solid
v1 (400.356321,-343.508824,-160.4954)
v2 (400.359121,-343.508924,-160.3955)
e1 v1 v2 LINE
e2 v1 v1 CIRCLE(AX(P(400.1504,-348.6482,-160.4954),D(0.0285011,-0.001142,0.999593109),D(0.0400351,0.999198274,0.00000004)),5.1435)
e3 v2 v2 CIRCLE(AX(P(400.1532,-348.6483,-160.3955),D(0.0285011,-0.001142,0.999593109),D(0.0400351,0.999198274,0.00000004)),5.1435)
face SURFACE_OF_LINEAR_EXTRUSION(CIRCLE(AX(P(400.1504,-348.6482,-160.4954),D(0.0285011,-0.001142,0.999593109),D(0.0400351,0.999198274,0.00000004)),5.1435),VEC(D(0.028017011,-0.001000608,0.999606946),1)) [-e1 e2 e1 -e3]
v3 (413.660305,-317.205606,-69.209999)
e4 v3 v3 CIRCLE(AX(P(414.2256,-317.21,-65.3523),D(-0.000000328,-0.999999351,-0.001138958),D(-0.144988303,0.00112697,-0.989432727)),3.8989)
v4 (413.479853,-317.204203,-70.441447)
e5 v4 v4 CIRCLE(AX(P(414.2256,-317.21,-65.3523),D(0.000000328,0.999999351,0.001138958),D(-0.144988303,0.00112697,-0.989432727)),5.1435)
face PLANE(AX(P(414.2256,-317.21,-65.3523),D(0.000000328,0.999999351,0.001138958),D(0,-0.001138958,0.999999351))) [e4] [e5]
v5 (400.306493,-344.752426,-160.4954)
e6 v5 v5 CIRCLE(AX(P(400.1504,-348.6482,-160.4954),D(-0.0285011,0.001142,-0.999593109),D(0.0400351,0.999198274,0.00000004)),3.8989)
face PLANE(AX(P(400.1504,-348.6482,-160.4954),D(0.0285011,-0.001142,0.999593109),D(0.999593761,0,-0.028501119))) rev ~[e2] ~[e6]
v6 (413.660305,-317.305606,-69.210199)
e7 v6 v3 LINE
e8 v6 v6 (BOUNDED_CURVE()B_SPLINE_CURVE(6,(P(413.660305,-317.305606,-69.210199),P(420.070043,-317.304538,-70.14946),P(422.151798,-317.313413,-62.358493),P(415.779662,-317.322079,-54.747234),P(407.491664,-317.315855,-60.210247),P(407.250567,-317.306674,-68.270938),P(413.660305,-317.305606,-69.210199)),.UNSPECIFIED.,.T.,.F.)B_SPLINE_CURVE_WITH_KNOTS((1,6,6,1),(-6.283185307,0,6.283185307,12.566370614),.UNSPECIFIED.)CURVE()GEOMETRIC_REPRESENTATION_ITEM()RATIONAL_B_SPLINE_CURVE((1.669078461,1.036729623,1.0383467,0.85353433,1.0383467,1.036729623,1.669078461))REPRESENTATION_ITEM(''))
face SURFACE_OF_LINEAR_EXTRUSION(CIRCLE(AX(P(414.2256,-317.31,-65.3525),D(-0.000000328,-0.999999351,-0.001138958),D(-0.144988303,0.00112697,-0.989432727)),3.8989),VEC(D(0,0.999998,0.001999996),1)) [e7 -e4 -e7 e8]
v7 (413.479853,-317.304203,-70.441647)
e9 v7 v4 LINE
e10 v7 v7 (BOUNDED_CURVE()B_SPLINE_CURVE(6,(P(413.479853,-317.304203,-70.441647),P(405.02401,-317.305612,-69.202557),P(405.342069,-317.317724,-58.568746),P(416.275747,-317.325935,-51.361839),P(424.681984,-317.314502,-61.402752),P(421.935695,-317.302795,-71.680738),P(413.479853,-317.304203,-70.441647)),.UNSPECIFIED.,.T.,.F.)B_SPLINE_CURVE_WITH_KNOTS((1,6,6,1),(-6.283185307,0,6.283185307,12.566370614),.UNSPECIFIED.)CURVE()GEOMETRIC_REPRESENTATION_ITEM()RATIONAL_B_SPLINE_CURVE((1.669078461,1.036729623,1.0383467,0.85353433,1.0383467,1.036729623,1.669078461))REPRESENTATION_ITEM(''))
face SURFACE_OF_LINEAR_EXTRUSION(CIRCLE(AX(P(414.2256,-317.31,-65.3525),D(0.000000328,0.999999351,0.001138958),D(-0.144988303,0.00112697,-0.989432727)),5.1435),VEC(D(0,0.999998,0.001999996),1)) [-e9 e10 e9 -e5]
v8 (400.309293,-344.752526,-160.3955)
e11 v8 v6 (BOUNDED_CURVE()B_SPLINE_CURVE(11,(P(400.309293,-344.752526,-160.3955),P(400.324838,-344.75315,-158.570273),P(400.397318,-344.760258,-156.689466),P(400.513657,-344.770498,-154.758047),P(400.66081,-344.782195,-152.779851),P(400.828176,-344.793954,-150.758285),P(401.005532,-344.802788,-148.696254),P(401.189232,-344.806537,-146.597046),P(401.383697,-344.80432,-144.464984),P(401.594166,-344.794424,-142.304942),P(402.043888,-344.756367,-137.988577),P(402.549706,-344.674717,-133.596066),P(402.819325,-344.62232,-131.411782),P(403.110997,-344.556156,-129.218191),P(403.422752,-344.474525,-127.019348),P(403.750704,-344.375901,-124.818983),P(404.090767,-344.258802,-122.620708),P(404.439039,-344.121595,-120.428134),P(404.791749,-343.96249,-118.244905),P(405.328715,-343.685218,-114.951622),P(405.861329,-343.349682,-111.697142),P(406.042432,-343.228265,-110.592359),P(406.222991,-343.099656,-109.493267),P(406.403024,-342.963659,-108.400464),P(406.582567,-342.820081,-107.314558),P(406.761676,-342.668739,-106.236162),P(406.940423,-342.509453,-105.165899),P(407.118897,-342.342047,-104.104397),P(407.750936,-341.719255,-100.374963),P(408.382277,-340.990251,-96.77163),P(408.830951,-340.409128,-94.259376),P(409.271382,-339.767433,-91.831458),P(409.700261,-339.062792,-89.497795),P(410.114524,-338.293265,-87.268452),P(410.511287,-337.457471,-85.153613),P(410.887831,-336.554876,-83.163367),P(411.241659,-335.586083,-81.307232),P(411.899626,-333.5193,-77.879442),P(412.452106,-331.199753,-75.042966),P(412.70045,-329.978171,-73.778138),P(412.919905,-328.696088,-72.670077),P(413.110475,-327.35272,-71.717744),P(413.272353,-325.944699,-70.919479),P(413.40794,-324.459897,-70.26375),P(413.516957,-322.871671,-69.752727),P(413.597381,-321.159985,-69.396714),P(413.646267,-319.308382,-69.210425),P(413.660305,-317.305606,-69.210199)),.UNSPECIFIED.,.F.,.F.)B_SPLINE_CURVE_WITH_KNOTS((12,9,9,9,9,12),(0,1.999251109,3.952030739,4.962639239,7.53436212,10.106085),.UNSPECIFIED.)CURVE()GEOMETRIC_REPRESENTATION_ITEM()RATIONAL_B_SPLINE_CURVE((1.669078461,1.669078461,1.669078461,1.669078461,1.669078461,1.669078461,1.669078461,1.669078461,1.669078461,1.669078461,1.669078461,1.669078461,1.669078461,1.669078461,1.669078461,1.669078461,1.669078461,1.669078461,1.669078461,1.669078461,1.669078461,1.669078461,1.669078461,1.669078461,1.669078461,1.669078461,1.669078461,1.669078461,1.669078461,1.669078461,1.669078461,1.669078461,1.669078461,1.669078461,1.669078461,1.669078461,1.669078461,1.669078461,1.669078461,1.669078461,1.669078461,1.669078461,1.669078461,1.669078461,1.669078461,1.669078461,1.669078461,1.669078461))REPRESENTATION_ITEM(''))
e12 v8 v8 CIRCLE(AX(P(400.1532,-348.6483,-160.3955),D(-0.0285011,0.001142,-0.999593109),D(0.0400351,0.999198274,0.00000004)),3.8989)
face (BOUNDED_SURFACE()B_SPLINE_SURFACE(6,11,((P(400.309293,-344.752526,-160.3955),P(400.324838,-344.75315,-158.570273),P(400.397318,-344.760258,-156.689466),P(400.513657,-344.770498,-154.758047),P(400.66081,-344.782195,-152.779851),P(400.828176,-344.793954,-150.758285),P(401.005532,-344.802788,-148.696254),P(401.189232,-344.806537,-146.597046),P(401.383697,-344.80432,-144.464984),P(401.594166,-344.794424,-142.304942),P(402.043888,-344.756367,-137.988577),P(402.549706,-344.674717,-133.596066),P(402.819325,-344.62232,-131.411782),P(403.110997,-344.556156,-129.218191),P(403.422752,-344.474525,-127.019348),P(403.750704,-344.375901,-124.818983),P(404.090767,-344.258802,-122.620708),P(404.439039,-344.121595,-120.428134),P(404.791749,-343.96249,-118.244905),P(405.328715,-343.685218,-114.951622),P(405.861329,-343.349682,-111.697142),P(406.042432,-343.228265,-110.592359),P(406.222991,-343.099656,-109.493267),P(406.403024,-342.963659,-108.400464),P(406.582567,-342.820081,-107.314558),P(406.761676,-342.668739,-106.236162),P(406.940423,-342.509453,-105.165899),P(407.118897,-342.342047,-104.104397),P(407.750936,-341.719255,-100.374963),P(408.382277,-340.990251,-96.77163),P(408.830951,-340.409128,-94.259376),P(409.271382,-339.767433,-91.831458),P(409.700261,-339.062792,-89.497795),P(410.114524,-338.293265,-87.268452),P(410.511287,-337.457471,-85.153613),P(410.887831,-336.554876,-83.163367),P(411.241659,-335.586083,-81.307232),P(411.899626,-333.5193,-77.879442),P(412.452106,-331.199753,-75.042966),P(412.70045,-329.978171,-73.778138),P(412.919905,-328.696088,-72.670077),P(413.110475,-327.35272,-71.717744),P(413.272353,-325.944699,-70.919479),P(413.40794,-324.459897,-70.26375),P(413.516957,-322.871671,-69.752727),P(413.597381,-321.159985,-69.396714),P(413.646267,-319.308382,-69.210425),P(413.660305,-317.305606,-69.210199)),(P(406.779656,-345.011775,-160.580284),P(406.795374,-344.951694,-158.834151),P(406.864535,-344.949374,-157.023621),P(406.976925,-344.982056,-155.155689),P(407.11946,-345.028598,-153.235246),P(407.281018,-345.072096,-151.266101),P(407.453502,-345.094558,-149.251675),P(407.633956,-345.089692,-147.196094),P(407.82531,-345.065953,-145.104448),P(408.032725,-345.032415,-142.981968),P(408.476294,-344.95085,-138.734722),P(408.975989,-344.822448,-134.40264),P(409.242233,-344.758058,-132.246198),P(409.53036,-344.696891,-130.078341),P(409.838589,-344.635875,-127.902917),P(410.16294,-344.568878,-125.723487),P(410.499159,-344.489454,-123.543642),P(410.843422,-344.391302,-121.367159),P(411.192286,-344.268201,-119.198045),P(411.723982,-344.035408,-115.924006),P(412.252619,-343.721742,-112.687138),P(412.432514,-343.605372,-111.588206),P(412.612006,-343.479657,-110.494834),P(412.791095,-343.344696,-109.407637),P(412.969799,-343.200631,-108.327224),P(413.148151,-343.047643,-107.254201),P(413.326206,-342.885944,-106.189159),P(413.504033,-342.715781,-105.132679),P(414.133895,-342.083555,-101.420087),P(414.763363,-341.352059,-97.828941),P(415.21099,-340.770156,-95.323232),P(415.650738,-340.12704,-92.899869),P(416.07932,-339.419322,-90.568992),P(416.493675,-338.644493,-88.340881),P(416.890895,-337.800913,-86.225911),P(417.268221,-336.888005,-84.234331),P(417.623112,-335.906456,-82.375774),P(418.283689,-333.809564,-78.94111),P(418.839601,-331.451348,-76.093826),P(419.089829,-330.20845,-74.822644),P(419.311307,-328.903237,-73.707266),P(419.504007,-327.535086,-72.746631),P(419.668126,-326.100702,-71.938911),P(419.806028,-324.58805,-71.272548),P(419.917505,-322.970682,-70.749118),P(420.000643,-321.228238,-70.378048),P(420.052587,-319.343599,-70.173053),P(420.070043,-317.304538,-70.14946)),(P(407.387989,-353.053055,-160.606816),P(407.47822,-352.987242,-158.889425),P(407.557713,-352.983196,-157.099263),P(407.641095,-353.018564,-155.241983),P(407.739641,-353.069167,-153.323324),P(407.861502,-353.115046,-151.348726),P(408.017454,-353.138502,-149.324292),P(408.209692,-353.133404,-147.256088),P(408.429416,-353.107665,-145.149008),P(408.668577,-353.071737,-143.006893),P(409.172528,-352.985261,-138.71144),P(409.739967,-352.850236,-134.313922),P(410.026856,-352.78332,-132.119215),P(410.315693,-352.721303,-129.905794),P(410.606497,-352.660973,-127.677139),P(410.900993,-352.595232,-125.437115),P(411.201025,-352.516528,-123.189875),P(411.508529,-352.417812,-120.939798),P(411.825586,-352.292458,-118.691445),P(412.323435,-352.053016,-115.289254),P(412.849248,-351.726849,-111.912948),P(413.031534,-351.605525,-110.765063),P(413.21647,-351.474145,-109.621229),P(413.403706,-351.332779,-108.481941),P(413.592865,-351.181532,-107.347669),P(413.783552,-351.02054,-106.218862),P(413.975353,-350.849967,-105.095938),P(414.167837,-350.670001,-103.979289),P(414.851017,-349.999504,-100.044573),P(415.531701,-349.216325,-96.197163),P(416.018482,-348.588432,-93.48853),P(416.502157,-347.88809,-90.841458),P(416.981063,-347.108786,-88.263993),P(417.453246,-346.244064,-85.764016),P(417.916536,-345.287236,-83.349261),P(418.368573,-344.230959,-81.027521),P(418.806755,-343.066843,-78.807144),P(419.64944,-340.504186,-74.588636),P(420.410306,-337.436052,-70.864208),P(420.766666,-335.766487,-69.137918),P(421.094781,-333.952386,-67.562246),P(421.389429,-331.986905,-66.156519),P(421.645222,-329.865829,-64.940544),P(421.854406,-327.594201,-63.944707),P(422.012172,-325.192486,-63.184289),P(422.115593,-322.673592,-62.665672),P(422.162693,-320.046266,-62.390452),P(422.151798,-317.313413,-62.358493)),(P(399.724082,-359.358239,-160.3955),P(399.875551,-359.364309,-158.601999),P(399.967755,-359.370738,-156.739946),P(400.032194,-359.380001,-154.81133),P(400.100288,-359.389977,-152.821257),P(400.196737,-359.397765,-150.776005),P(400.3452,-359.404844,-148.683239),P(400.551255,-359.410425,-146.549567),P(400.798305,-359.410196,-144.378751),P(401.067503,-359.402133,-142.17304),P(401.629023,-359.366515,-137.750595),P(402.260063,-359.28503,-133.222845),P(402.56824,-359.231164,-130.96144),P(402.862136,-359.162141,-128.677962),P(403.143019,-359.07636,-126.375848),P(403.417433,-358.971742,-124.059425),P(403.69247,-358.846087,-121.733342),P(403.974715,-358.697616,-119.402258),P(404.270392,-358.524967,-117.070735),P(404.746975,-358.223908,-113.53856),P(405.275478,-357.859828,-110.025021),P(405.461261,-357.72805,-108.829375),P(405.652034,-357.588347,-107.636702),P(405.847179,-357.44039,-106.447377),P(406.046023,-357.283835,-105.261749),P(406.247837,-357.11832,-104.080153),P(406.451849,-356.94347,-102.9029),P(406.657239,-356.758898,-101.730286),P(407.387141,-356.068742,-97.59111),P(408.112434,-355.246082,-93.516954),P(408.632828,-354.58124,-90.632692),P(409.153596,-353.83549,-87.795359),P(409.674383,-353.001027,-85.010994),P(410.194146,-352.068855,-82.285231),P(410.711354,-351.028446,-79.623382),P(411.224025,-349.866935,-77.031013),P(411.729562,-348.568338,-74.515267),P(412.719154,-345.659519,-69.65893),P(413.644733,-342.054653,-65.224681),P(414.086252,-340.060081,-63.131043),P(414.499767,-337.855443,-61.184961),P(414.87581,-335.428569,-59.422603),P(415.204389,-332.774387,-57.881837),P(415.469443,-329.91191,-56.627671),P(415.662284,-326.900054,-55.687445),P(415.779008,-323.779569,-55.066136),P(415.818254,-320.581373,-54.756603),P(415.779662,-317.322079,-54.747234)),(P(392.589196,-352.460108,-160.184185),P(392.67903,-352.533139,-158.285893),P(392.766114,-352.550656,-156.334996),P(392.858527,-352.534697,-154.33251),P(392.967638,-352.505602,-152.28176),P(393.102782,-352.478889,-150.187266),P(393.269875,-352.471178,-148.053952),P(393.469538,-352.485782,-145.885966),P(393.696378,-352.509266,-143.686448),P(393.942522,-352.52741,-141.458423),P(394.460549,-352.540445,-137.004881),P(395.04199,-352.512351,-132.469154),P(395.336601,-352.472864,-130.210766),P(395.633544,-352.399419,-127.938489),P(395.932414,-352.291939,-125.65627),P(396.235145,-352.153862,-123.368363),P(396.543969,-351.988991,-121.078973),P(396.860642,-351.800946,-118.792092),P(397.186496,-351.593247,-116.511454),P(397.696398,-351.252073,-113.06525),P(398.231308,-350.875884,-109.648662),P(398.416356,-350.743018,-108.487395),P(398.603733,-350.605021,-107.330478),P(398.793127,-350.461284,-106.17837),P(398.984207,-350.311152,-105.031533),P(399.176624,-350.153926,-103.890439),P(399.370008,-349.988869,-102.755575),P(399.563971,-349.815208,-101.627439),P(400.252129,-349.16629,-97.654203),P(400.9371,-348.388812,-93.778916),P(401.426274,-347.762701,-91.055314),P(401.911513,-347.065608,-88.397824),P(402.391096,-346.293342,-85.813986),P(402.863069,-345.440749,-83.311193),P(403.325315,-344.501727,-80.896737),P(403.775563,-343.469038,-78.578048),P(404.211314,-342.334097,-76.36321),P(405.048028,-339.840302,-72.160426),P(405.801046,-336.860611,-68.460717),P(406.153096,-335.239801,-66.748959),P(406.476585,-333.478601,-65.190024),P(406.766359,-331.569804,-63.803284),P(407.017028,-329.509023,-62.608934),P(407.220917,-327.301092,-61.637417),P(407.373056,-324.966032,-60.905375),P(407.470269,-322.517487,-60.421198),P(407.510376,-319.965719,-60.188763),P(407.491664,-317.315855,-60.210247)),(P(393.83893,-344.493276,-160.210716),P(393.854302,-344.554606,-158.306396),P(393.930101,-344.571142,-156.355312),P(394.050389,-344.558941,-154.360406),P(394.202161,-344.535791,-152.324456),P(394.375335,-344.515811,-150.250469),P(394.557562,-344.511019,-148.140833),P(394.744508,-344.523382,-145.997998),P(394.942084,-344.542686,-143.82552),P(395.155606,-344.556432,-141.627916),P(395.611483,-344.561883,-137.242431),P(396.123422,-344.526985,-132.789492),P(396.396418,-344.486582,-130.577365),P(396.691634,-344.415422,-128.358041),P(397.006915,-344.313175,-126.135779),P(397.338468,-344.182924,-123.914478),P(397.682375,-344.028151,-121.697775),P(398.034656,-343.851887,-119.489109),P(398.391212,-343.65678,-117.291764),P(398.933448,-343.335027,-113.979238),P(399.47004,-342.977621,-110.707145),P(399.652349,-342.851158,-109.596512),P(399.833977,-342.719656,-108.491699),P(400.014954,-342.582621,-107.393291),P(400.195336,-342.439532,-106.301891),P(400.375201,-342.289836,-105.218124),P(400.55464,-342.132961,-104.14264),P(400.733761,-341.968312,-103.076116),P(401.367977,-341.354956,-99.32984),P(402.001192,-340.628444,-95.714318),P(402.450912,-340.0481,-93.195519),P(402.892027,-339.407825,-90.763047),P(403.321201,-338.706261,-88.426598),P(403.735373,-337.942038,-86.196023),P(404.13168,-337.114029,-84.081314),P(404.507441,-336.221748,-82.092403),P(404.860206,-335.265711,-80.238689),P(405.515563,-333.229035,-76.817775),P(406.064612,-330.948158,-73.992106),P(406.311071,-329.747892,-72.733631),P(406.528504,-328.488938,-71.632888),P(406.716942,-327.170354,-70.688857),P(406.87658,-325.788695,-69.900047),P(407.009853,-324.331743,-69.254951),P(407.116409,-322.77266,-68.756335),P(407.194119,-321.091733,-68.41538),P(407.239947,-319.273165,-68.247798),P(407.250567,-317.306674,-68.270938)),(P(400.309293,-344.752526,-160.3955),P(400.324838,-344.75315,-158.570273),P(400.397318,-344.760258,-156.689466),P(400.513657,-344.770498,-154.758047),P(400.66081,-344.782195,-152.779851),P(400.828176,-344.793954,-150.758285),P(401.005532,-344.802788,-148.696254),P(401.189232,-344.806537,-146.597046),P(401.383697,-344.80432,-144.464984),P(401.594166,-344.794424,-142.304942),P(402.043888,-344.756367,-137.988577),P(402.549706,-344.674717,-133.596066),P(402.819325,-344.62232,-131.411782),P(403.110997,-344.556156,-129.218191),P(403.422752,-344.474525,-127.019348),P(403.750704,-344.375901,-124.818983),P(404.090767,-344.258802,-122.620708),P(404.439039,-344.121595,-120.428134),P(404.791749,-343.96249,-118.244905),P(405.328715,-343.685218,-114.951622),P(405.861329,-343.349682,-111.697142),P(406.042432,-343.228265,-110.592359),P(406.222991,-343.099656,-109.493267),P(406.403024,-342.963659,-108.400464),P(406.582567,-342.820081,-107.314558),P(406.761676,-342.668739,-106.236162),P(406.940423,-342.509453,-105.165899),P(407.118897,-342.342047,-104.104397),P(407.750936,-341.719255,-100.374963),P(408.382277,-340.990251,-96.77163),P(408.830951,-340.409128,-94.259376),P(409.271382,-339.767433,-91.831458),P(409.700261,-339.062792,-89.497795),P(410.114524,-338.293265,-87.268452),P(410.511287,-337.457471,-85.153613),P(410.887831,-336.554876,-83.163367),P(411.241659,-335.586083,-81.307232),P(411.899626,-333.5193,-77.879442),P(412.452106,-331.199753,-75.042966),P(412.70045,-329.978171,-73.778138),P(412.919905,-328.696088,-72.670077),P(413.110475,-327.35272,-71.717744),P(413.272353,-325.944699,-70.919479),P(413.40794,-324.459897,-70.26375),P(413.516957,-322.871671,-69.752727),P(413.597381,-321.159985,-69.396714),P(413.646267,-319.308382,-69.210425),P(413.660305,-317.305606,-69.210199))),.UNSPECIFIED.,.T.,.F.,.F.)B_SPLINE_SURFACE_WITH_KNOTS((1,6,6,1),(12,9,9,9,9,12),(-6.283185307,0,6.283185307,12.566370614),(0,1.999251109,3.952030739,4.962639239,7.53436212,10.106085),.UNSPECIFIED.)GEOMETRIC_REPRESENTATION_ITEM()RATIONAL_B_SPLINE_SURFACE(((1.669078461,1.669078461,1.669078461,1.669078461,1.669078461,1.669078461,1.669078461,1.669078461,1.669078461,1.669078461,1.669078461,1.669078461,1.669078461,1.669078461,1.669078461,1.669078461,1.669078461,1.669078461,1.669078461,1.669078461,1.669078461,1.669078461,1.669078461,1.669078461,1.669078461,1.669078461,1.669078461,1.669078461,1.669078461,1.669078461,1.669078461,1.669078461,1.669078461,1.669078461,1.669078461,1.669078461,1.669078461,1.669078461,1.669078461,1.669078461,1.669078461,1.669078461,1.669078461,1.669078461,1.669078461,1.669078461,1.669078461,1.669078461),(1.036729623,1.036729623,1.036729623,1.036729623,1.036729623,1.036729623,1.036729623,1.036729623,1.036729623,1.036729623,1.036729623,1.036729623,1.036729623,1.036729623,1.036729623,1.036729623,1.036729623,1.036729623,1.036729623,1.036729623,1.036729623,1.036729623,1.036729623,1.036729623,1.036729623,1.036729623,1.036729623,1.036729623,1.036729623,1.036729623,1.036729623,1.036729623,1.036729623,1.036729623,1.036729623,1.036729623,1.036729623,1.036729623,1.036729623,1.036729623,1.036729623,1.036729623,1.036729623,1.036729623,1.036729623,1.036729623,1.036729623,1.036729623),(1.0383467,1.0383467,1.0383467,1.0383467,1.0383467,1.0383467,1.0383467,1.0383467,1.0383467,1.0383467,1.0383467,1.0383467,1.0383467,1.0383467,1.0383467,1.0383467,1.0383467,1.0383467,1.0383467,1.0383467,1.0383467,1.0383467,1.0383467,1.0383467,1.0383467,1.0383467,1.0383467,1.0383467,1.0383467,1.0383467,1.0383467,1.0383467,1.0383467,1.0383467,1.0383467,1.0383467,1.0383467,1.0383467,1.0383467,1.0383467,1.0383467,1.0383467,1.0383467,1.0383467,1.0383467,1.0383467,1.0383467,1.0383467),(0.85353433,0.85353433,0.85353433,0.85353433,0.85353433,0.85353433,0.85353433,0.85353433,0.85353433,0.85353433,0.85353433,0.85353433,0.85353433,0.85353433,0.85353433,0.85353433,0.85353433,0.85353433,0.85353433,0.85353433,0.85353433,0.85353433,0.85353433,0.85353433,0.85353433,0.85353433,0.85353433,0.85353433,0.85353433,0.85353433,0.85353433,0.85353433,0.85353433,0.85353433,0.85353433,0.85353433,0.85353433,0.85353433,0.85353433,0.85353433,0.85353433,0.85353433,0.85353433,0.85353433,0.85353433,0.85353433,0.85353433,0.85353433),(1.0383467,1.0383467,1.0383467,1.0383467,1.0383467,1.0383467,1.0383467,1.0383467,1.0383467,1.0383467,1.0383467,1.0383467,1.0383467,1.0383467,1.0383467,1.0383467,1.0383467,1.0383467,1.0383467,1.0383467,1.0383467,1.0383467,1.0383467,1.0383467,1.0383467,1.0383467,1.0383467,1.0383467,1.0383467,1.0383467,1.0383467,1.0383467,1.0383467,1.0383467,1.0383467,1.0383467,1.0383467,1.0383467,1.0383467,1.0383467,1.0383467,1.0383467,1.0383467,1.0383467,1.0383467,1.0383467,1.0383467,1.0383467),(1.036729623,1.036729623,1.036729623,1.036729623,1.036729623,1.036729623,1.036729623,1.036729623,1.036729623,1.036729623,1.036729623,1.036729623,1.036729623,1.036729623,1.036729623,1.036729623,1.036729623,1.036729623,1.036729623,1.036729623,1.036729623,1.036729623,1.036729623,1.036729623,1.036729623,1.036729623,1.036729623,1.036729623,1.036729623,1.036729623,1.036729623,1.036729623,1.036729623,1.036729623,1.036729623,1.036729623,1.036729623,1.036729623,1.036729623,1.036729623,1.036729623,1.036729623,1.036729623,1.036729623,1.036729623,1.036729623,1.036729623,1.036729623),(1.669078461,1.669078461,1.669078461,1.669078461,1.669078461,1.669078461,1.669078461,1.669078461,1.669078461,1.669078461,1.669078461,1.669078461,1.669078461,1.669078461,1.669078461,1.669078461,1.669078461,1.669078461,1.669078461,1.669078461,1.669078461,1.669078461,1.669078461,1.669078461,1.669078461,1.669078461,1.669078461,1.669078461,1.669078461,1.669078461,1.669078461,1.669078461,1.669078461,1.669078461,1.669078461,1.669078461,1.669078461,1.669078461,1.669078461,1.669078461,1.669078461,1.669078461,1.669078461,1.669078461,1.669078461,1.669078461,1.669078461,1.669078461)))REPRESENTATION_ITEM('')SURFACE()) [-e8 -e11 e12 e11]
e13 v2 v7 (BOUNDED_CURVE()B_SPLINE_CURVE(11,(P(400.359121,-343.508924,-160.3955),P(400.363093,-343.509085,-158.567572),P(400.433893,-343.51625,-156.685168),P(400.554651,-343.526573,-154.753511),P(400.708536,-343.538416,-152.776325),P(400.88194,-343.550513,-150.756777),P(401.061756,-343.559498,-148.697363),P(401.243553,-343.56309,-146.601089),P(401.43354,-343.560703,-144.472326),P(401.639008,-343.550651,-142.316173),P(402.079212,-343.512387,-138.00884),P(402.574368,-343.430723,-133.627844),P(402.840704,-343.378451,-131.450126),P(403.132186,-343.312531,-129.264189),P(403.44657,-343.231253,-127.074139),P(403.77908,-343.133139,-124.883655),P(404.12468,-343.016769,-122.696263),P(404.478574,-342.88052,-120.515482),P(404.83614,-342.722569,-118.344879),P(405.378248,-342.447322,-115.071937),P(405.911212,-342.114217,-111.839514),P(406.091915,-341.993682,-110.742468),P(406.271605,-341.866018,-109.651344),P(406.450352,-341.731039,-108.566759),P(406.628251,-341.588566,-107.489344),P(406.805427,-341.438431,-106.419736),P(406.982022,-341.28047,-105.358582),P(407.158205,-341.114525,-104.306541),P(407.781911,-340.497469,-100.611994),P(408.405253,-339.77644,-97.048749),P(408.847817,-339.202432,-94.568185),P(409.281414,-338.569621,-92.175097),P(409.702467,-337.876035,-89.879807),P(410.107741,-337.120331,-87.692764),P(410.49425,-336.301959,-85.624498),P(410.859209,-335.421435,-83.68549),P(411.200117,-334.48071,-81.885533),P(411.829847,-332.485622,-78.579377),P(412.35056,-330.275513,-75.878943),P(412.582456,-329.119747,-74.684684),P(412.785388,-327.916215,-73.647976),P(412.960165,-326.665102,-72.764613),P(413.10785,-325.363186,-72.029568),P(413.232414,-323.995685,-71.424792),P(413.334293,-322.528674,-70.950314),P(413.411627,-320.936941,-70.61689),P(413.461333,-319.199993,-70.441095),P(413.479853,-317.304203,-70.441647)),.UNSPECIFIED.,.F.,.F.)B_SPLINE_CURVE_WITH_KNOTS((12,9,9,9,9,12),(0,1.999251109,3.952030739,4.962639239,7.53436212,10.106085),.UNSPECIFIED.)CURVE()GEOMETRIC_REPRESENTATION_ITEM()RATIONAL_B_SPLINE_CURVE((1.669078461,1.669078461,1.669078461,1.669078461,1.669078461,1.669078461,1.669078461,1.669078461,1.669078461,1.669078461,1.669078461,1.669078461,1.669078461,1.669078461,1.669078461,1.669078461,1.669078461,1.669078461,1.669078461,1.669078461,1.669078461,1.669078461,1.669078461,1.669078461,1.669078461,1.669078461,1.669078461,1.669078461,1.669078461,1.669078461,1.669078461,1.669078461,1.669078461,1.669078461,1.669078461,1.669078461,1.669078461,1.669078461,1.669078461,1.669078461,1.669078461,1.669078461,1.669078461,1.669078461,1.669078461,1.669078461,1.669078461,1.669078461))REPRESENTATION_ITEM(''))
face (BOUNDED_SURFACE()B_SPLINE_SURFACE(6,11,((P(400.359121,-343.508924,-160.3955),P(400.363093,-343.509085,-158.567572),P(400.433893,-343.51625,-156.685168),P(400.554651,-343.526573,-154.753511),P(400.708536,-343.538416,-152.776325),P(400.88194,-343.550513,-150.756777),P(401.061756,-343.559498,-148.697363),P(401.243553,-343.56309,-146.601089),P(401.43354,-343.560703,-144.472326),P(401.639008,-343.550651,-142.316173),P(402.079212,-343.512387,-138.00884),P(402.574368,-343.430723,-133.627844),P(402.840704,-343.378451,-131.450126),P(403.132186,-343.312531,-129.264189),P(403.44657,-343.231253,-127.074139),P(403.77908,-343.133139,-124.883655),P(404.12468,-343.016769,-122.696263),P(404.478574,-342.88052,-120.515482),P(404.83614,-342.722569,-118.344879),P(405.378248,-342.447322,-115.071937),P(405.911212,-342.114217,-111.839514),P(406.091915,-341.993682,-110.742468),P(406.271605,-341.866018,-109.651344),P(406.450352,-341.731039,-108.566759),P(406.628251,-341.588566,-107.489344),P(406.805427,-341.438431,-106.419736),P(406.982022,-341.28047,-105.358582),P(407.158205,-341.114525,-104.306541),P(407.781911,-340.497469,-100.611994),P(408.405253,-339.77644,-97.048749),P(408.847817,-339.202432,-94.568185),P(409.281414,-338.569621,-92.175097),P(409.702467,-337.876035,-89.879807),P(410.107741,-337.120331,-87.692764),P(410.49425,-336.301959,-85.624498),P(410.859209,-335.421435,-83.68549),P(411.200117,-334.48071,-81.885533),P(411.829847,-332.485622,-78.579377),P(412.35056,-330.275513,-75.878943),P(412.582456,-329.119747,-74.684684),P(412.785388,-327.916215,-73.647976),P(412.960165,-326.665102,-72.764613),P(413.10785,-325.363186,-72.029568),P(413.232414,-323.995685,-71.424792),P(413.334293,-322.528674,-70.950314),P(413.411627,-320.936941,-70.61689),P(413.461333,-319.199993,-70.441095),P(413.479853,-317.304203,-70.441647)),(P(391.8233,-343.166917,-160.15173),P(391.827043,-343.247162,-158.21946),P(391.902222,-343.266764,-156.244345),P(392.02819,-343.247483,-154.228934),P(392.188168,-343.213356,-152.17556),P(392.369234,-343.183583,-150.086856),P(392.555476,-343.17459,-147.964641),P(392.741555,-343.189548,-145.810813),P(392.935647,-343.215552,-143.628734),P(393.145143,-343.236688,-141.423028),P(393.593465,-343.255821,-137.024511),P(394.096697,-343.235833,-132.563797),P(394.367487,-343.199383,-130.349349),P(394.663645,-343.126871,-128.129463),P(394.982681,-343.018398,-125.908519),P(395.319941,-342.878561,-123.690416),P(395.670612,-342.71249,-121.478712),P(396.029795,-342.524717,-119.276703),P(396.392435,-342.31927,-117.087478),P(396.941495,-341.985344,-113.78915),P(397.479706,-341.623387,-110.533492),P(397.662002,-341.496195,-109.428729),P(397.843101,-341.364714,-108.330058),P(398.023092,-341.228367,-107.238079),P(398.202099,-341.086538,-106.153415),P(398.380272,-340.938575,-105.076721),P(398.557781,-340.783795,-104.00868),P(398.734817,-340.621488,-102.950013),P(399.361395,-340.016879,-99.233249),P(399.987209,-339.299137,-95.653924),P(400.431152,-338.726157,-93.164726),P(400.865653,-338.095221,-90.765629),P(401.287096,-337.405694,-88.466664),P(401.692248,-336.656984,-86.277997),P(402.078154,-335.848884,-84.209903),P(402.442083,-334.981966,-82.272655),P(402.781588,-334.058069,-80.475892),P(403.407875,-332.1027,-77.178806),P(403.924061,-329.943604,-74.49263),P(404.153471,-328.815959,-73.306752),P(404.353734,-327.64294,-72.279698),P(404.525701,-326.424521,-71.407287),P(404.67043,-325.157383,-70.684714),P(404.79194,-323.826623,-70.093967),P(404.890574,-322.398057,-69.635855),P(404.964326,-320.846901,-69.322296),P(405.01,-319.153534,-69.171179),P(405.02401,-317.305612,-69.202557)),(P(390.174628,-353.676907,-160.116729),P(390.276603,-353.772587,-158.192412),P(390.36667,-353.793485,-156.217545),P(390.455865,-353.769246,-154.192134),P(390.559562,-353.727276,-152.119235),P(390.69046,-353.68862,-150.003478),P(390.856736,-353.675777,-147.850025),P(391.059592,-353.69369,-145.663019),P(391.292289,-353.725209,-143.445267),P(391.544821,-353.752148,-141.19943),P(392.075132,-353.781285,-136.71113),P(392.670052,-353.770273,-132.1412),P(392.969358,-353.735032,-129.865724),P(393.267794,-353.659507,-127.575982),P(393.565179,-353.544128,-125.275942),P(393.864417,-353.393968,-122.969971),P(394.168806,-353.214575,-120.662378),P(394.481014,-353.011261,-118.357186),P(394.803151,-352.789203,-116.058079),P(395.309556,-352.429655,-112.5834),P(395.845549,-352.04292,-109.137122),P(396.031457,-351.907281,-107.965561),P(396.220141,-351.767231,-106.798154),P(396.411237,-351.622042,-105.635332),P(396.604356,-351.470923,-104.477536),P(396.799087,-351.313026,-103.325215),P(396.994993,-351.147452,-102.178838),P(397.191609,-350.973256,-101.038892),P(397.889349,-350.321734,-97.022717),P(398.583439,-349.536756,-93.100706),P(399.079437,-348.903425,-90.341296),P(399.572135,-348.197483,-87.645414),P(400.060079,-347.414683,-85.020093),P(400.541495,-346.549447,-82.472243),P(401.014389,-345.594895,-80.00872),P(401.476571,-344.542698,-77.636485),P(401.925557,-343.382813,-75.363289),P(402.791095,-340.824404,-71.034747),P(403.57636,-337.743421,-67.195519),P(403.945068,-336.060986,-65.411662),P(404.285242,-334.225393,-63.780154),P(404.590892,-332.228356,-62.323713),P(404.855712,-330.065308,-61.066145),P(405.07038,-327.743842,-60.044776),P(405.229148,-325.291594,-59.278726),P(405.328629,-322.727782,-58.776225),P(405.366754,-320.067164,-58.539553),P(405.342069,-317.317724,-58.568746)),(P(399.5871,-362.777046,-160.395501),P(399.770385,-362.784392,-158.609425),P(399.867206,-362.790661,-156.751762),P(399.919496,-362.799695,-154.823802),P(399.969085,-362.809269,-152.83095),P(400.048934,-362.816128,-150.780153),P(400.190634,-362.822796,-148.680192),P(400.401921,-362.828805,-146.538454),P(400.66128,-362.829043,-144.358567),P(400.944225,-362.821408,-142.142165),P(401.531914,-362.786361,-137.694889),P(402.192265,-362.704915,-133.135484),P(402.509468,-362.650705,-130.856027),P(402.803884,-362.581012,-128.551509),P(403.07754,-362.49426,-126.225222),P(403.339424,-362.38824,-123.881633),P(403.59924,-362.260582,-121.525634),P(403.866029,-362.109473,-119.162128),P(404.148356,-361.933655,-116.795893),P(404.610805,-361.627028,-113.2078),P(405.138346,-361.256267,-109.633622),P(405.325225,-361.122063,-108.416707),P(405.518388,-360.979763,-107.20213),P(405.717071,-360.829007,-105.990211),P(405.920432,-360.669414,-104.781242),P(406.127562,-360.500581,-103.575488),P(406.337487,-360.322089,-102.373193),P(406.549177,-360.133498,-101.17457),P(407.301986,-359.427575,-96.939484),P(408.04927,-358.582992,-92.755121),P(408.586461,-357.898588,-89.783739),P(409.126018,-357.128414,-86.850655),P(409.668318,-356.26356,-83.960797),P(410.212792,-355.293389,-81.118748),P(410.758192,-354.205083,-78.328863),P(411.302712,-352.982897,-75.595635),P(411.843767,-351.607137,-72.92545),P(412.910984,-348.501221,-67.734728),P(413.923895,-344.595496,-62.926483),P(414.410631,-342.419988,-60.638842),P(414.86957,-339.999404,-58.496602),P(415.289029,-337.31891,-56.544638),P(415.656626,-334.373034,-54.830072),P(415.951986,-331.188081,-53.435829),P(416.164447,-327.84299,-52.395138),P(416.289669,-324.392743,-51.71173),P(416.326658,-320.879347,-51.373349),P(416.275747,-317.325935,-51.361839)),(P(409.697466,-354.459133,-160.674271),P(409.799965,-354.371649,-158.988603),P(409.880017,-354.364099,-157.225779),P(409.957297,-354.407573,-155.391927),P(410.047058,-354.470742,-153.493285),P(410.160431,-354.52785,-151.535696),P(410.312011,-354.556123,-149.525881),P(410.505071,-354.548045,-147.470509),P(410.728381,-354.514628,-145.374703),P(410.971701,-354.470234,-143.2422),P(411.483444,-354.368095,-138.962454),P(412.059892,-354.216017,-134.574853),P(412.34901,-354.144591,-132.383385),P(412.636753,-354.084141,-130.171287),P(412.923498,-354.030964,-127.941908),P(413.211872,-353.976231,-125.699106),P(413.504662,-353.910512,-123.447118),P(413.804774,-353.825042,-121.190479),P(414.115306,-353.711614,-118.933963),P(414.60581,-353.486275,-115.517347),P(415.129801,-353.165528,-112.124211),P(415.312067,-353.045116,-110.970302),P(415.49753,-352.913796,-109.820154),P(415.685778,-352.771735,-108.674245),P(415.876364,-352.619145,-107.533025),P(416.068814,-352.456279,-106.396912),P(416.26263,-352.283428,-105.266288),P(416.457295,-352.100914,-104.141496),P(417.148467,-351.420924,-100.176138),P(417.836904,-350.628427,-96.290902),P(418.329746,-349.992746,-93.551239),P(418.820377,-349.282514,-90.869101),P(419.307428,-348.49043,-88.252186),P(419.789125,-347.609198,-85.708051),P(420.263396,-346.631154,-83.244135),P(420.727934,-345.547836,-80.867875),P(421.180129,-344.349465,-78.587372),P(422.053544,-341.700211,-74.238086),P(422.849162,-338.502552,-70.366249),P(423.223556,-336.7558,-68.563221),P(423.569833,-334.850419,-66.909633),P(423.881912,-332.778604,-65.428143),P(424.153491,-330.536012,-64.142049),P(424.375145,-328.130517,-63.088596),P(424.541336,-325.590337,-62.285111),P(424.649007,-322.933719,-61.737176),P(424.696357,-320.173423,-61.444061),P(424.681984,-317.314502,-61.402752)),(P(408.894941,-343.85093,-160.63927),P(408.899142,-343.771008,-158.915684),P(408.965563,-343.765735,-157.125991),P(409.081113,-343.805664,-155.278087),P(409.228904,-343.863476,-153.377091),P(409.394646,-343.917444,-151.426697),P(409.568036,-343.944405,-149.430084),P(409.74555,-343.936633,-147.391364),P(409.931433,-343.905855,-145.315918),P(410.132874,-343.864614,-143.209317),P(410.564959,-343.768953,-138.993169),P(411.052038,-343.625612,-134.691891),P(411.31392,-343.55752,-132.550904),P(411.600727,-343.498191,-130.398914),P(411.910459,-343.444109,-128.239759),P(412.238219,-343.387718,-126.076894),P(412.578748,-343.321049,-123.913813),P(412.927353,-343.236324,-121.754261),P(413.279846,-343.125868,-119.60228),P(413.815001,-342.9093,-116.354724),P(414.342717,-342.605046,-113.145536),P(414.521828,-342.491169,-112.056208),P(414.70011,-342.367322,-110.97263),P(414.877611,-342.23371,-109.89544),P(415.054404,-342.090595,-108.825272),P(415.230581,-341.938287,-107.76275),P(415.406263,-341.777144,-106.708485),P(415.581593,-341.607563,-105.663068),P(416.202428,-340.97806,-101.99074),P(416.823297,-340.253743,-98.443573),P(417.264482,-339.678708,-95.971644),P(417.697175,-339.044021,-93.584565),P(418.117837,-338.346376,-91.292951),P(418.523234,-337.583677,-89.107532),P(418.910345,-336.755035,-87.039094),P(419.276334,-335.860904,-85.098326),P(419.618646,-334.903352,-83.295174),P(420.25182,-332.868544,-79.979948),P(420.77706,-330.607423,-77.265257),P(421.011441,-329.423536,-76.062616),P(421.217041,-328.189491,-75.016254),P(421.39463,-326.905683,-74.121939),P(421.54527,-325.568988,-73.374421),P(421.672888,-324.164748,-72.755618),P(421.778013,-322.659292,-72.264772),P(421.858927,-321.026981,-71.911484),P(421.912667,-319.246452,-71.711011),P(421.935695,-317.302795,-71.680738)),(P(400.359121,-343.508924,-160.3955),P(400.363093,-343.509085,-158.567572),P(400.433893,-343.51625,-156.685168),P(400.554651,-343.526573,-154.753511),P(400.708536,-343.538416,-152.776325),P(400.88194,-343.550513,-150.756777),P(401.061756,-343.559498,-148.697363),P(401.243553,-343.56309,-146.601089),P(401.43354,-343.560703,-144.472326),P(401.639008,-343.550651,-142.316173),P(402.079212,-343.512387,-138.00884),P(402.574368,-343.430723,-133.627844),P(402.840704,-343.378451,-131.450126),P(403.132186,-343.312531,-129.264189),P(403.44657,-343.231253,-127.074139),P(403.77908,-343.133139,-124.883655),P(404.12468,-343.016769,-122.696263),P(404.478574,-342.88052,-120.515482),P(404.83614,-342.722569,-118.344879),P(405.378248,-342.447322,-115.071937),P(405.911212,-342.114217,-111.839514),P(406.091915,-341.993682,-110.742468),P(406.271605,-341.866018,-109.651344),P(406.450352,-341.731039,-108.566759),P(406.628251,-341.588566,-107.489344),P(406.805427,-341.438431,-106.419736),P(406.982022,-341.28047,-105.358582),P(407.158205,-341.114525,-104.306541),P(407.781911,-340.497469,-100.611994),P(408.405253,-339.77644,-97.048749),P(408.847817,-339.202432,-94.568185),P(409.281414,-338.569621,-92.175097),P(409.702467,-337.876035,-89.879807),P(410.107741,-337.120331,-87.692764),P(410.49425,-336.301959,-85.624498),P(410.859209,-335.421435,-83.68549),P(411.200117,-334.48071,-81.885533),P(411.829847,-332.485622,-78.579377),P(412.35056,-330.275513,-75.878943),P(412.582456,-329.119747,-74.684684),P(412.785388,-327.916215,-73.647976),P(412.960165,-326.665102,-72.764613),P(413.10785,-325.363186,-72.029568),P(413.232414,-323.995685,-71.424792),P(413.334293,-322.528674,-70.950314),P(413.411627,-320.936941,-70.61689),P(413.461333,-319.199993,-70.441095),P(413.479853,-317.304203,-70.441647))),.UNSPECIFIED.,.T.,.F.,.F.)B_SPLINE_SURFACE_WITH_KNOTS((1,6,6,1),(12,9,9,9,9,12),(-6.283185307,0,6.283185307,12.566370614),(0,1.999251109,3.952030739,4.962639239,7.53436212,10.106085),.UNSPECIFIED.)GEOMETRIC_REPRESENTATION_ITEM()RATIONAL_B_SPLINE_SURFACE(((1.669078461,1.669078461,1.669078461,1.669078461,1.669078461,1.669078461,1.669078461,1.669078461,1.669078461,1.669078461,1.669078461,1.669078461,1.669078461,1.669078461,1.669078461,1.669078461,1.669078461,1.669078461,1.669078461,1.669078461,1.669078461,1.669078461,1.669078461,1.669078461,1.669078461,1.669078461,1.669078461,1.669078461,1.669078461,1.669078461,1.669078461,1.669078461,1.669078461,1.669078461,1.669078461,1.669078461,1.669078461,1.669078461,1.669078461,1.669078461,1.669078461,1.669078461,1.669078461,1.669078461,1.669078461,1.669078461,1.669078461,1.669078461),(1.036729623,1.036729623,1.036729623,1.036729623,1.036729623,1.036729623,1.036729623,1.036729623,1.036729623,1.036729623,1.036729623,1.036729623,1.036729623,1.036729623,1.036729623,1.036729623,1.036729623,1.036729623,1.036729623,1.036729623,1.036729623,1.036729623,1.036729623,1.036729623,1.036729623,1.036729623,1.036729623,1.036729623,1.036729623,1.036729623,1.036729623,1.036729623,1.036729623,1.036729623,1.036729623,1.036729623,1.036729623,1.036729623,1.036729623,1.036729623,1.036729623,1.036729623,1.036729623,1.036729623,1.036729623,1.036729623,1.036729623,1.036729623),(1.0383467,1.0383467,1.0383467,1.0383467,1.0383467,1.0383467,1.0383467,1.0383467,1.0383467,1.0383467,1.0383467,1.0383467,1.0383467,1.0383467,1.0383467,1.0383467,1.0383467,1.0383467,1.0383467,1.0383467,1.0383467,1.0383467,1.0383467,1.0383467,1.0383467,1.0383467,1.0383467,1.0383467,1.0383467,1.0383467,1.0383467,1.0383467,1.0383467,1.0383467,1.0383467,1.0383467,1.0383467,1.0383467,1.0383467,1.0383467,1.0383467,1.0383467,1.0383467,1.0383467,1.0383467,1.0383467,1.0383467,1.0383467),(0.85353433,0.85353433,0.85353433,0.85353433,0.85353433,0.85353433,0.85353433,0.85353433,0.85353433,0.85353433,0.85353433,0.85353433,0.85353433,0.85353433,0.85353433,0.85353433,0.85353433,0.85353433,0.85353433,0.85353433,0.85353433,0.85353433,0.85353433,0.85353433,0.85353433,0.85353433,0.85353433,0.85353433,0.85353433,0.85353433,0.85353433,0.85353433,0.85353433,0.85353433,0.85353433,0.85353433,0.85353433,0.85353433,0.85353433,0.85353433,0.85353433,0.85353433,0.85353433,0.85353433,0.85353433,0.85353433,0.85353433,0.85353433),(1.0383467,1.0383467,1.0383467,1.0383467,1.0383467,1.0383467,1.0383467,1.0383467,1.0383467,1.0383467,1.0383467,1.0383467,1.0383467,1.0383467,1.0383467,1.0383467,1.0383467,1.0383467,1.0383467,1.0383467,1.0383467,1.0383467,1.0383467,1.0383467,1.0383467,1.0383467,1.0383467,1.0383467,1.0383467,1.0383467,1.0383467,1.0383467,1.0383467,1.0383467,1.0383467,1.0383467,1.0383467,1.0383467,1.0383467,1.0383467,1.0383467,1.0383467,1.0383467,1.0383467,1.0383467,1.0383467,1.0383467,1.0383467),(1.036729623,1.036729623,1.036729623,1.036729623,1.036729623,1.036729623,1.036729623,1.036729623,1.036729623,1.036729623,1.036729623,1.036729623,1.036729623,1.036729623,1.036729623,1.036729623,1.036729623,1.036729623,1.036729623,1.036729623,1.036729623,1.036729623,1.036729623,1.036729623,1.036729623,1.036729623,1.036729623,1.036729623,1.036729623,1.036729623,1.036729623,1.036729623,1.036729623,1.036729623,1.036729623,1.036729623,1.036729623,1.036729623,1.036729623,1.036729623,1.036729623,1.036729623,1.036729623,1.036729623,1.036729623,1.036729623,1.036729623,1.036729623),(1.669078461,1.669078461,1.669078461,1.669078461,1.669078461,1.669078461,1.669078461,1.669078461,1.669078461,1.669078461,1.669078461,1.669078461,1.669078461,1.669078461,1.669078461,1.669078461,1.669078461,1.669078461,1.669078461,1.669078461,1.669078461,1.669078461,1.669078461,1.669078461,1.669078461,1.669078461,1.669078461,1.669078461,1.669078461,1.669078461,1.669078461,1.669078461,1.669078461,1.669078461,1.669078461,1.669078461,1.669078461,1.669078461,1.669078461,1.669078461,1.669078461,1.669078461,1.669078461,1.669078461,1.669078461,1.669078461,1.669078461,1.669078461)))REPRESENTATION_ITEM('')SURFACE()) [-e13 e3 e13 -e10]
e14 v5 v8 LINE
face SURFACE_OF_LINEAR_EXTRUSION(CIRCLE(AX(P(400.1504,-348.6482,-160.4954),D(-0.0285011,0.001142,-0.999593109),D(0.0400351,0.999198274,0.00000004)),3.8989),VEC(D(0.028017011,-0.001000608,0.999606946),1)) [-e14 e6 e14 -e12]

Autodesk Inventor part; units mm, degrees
ref_plane "YZ Plane" through (0, 0, 0) normal (1, 0, 0) x (0, 1, 0)
ref_plane "XZ Plane" through (0, 0, 0) normal (0, 1, 0) x (-1, 0, 0)
ref_plane "XY Plane" through (0, 0, 0) normal (0, 0, 1) x (1, 0, 0)
ref_plane "Work Plane1" through (400.1532, -348.6483, -160.3955) normal (0.0285011, -0.001142, 0.9995931) x (0.0400351, 0.9991983, 0)
sketch "Sketch3" plane through (400.1532, -348.6483, -160.3955) normal (0.0285011, -0.001142, 0.9995931) x (0.0400351, 0.9991983, 0)
  circle A0 centre (0, 0) radius 5.1435
  circle A1 centre (0, 0) radius 3.8989
  point P0 (0, 0)
sketch3d "3D Sketch1"
  line L0 (400.1504, -348.6482, -160.4954) -> (400.1532, -348.6483, -160.3955)
  spline S0 degree 3 poles (400.1532, -348.6483, -160.3955) (401.1133, -348.6868, -126.7222) (414.2256, -350.9969, -65.3909) (414.2256, -317.31, -65.3525) knots 0 0 0 0 10.106085 10.106085 10.106085 10.106085
  line L1 (414.2256, -317.31, -65.3525) -> (414.2256, -317.21, -65.3523)
  dimension "d8" = 1
  dimension "d9" = 1
sweep "Sweep1" add profiles "Sketch3" path "3D Sketch1"
equation "\"OD\" = 10.287"
equation "\"t\" = 1.2446"
equation "\"L\" = PL"
equation "\"ID\" = 7.7978"
equation "\"PL\" = 110.49"
equation "\"Size_Designation\" = 1.2345"
equation "\"RPL\" = 111.125"
equation "\"OPL\" = 110.49"
equation "\"ROPL\" = 111.125"
properties material "Stainless Steel"
